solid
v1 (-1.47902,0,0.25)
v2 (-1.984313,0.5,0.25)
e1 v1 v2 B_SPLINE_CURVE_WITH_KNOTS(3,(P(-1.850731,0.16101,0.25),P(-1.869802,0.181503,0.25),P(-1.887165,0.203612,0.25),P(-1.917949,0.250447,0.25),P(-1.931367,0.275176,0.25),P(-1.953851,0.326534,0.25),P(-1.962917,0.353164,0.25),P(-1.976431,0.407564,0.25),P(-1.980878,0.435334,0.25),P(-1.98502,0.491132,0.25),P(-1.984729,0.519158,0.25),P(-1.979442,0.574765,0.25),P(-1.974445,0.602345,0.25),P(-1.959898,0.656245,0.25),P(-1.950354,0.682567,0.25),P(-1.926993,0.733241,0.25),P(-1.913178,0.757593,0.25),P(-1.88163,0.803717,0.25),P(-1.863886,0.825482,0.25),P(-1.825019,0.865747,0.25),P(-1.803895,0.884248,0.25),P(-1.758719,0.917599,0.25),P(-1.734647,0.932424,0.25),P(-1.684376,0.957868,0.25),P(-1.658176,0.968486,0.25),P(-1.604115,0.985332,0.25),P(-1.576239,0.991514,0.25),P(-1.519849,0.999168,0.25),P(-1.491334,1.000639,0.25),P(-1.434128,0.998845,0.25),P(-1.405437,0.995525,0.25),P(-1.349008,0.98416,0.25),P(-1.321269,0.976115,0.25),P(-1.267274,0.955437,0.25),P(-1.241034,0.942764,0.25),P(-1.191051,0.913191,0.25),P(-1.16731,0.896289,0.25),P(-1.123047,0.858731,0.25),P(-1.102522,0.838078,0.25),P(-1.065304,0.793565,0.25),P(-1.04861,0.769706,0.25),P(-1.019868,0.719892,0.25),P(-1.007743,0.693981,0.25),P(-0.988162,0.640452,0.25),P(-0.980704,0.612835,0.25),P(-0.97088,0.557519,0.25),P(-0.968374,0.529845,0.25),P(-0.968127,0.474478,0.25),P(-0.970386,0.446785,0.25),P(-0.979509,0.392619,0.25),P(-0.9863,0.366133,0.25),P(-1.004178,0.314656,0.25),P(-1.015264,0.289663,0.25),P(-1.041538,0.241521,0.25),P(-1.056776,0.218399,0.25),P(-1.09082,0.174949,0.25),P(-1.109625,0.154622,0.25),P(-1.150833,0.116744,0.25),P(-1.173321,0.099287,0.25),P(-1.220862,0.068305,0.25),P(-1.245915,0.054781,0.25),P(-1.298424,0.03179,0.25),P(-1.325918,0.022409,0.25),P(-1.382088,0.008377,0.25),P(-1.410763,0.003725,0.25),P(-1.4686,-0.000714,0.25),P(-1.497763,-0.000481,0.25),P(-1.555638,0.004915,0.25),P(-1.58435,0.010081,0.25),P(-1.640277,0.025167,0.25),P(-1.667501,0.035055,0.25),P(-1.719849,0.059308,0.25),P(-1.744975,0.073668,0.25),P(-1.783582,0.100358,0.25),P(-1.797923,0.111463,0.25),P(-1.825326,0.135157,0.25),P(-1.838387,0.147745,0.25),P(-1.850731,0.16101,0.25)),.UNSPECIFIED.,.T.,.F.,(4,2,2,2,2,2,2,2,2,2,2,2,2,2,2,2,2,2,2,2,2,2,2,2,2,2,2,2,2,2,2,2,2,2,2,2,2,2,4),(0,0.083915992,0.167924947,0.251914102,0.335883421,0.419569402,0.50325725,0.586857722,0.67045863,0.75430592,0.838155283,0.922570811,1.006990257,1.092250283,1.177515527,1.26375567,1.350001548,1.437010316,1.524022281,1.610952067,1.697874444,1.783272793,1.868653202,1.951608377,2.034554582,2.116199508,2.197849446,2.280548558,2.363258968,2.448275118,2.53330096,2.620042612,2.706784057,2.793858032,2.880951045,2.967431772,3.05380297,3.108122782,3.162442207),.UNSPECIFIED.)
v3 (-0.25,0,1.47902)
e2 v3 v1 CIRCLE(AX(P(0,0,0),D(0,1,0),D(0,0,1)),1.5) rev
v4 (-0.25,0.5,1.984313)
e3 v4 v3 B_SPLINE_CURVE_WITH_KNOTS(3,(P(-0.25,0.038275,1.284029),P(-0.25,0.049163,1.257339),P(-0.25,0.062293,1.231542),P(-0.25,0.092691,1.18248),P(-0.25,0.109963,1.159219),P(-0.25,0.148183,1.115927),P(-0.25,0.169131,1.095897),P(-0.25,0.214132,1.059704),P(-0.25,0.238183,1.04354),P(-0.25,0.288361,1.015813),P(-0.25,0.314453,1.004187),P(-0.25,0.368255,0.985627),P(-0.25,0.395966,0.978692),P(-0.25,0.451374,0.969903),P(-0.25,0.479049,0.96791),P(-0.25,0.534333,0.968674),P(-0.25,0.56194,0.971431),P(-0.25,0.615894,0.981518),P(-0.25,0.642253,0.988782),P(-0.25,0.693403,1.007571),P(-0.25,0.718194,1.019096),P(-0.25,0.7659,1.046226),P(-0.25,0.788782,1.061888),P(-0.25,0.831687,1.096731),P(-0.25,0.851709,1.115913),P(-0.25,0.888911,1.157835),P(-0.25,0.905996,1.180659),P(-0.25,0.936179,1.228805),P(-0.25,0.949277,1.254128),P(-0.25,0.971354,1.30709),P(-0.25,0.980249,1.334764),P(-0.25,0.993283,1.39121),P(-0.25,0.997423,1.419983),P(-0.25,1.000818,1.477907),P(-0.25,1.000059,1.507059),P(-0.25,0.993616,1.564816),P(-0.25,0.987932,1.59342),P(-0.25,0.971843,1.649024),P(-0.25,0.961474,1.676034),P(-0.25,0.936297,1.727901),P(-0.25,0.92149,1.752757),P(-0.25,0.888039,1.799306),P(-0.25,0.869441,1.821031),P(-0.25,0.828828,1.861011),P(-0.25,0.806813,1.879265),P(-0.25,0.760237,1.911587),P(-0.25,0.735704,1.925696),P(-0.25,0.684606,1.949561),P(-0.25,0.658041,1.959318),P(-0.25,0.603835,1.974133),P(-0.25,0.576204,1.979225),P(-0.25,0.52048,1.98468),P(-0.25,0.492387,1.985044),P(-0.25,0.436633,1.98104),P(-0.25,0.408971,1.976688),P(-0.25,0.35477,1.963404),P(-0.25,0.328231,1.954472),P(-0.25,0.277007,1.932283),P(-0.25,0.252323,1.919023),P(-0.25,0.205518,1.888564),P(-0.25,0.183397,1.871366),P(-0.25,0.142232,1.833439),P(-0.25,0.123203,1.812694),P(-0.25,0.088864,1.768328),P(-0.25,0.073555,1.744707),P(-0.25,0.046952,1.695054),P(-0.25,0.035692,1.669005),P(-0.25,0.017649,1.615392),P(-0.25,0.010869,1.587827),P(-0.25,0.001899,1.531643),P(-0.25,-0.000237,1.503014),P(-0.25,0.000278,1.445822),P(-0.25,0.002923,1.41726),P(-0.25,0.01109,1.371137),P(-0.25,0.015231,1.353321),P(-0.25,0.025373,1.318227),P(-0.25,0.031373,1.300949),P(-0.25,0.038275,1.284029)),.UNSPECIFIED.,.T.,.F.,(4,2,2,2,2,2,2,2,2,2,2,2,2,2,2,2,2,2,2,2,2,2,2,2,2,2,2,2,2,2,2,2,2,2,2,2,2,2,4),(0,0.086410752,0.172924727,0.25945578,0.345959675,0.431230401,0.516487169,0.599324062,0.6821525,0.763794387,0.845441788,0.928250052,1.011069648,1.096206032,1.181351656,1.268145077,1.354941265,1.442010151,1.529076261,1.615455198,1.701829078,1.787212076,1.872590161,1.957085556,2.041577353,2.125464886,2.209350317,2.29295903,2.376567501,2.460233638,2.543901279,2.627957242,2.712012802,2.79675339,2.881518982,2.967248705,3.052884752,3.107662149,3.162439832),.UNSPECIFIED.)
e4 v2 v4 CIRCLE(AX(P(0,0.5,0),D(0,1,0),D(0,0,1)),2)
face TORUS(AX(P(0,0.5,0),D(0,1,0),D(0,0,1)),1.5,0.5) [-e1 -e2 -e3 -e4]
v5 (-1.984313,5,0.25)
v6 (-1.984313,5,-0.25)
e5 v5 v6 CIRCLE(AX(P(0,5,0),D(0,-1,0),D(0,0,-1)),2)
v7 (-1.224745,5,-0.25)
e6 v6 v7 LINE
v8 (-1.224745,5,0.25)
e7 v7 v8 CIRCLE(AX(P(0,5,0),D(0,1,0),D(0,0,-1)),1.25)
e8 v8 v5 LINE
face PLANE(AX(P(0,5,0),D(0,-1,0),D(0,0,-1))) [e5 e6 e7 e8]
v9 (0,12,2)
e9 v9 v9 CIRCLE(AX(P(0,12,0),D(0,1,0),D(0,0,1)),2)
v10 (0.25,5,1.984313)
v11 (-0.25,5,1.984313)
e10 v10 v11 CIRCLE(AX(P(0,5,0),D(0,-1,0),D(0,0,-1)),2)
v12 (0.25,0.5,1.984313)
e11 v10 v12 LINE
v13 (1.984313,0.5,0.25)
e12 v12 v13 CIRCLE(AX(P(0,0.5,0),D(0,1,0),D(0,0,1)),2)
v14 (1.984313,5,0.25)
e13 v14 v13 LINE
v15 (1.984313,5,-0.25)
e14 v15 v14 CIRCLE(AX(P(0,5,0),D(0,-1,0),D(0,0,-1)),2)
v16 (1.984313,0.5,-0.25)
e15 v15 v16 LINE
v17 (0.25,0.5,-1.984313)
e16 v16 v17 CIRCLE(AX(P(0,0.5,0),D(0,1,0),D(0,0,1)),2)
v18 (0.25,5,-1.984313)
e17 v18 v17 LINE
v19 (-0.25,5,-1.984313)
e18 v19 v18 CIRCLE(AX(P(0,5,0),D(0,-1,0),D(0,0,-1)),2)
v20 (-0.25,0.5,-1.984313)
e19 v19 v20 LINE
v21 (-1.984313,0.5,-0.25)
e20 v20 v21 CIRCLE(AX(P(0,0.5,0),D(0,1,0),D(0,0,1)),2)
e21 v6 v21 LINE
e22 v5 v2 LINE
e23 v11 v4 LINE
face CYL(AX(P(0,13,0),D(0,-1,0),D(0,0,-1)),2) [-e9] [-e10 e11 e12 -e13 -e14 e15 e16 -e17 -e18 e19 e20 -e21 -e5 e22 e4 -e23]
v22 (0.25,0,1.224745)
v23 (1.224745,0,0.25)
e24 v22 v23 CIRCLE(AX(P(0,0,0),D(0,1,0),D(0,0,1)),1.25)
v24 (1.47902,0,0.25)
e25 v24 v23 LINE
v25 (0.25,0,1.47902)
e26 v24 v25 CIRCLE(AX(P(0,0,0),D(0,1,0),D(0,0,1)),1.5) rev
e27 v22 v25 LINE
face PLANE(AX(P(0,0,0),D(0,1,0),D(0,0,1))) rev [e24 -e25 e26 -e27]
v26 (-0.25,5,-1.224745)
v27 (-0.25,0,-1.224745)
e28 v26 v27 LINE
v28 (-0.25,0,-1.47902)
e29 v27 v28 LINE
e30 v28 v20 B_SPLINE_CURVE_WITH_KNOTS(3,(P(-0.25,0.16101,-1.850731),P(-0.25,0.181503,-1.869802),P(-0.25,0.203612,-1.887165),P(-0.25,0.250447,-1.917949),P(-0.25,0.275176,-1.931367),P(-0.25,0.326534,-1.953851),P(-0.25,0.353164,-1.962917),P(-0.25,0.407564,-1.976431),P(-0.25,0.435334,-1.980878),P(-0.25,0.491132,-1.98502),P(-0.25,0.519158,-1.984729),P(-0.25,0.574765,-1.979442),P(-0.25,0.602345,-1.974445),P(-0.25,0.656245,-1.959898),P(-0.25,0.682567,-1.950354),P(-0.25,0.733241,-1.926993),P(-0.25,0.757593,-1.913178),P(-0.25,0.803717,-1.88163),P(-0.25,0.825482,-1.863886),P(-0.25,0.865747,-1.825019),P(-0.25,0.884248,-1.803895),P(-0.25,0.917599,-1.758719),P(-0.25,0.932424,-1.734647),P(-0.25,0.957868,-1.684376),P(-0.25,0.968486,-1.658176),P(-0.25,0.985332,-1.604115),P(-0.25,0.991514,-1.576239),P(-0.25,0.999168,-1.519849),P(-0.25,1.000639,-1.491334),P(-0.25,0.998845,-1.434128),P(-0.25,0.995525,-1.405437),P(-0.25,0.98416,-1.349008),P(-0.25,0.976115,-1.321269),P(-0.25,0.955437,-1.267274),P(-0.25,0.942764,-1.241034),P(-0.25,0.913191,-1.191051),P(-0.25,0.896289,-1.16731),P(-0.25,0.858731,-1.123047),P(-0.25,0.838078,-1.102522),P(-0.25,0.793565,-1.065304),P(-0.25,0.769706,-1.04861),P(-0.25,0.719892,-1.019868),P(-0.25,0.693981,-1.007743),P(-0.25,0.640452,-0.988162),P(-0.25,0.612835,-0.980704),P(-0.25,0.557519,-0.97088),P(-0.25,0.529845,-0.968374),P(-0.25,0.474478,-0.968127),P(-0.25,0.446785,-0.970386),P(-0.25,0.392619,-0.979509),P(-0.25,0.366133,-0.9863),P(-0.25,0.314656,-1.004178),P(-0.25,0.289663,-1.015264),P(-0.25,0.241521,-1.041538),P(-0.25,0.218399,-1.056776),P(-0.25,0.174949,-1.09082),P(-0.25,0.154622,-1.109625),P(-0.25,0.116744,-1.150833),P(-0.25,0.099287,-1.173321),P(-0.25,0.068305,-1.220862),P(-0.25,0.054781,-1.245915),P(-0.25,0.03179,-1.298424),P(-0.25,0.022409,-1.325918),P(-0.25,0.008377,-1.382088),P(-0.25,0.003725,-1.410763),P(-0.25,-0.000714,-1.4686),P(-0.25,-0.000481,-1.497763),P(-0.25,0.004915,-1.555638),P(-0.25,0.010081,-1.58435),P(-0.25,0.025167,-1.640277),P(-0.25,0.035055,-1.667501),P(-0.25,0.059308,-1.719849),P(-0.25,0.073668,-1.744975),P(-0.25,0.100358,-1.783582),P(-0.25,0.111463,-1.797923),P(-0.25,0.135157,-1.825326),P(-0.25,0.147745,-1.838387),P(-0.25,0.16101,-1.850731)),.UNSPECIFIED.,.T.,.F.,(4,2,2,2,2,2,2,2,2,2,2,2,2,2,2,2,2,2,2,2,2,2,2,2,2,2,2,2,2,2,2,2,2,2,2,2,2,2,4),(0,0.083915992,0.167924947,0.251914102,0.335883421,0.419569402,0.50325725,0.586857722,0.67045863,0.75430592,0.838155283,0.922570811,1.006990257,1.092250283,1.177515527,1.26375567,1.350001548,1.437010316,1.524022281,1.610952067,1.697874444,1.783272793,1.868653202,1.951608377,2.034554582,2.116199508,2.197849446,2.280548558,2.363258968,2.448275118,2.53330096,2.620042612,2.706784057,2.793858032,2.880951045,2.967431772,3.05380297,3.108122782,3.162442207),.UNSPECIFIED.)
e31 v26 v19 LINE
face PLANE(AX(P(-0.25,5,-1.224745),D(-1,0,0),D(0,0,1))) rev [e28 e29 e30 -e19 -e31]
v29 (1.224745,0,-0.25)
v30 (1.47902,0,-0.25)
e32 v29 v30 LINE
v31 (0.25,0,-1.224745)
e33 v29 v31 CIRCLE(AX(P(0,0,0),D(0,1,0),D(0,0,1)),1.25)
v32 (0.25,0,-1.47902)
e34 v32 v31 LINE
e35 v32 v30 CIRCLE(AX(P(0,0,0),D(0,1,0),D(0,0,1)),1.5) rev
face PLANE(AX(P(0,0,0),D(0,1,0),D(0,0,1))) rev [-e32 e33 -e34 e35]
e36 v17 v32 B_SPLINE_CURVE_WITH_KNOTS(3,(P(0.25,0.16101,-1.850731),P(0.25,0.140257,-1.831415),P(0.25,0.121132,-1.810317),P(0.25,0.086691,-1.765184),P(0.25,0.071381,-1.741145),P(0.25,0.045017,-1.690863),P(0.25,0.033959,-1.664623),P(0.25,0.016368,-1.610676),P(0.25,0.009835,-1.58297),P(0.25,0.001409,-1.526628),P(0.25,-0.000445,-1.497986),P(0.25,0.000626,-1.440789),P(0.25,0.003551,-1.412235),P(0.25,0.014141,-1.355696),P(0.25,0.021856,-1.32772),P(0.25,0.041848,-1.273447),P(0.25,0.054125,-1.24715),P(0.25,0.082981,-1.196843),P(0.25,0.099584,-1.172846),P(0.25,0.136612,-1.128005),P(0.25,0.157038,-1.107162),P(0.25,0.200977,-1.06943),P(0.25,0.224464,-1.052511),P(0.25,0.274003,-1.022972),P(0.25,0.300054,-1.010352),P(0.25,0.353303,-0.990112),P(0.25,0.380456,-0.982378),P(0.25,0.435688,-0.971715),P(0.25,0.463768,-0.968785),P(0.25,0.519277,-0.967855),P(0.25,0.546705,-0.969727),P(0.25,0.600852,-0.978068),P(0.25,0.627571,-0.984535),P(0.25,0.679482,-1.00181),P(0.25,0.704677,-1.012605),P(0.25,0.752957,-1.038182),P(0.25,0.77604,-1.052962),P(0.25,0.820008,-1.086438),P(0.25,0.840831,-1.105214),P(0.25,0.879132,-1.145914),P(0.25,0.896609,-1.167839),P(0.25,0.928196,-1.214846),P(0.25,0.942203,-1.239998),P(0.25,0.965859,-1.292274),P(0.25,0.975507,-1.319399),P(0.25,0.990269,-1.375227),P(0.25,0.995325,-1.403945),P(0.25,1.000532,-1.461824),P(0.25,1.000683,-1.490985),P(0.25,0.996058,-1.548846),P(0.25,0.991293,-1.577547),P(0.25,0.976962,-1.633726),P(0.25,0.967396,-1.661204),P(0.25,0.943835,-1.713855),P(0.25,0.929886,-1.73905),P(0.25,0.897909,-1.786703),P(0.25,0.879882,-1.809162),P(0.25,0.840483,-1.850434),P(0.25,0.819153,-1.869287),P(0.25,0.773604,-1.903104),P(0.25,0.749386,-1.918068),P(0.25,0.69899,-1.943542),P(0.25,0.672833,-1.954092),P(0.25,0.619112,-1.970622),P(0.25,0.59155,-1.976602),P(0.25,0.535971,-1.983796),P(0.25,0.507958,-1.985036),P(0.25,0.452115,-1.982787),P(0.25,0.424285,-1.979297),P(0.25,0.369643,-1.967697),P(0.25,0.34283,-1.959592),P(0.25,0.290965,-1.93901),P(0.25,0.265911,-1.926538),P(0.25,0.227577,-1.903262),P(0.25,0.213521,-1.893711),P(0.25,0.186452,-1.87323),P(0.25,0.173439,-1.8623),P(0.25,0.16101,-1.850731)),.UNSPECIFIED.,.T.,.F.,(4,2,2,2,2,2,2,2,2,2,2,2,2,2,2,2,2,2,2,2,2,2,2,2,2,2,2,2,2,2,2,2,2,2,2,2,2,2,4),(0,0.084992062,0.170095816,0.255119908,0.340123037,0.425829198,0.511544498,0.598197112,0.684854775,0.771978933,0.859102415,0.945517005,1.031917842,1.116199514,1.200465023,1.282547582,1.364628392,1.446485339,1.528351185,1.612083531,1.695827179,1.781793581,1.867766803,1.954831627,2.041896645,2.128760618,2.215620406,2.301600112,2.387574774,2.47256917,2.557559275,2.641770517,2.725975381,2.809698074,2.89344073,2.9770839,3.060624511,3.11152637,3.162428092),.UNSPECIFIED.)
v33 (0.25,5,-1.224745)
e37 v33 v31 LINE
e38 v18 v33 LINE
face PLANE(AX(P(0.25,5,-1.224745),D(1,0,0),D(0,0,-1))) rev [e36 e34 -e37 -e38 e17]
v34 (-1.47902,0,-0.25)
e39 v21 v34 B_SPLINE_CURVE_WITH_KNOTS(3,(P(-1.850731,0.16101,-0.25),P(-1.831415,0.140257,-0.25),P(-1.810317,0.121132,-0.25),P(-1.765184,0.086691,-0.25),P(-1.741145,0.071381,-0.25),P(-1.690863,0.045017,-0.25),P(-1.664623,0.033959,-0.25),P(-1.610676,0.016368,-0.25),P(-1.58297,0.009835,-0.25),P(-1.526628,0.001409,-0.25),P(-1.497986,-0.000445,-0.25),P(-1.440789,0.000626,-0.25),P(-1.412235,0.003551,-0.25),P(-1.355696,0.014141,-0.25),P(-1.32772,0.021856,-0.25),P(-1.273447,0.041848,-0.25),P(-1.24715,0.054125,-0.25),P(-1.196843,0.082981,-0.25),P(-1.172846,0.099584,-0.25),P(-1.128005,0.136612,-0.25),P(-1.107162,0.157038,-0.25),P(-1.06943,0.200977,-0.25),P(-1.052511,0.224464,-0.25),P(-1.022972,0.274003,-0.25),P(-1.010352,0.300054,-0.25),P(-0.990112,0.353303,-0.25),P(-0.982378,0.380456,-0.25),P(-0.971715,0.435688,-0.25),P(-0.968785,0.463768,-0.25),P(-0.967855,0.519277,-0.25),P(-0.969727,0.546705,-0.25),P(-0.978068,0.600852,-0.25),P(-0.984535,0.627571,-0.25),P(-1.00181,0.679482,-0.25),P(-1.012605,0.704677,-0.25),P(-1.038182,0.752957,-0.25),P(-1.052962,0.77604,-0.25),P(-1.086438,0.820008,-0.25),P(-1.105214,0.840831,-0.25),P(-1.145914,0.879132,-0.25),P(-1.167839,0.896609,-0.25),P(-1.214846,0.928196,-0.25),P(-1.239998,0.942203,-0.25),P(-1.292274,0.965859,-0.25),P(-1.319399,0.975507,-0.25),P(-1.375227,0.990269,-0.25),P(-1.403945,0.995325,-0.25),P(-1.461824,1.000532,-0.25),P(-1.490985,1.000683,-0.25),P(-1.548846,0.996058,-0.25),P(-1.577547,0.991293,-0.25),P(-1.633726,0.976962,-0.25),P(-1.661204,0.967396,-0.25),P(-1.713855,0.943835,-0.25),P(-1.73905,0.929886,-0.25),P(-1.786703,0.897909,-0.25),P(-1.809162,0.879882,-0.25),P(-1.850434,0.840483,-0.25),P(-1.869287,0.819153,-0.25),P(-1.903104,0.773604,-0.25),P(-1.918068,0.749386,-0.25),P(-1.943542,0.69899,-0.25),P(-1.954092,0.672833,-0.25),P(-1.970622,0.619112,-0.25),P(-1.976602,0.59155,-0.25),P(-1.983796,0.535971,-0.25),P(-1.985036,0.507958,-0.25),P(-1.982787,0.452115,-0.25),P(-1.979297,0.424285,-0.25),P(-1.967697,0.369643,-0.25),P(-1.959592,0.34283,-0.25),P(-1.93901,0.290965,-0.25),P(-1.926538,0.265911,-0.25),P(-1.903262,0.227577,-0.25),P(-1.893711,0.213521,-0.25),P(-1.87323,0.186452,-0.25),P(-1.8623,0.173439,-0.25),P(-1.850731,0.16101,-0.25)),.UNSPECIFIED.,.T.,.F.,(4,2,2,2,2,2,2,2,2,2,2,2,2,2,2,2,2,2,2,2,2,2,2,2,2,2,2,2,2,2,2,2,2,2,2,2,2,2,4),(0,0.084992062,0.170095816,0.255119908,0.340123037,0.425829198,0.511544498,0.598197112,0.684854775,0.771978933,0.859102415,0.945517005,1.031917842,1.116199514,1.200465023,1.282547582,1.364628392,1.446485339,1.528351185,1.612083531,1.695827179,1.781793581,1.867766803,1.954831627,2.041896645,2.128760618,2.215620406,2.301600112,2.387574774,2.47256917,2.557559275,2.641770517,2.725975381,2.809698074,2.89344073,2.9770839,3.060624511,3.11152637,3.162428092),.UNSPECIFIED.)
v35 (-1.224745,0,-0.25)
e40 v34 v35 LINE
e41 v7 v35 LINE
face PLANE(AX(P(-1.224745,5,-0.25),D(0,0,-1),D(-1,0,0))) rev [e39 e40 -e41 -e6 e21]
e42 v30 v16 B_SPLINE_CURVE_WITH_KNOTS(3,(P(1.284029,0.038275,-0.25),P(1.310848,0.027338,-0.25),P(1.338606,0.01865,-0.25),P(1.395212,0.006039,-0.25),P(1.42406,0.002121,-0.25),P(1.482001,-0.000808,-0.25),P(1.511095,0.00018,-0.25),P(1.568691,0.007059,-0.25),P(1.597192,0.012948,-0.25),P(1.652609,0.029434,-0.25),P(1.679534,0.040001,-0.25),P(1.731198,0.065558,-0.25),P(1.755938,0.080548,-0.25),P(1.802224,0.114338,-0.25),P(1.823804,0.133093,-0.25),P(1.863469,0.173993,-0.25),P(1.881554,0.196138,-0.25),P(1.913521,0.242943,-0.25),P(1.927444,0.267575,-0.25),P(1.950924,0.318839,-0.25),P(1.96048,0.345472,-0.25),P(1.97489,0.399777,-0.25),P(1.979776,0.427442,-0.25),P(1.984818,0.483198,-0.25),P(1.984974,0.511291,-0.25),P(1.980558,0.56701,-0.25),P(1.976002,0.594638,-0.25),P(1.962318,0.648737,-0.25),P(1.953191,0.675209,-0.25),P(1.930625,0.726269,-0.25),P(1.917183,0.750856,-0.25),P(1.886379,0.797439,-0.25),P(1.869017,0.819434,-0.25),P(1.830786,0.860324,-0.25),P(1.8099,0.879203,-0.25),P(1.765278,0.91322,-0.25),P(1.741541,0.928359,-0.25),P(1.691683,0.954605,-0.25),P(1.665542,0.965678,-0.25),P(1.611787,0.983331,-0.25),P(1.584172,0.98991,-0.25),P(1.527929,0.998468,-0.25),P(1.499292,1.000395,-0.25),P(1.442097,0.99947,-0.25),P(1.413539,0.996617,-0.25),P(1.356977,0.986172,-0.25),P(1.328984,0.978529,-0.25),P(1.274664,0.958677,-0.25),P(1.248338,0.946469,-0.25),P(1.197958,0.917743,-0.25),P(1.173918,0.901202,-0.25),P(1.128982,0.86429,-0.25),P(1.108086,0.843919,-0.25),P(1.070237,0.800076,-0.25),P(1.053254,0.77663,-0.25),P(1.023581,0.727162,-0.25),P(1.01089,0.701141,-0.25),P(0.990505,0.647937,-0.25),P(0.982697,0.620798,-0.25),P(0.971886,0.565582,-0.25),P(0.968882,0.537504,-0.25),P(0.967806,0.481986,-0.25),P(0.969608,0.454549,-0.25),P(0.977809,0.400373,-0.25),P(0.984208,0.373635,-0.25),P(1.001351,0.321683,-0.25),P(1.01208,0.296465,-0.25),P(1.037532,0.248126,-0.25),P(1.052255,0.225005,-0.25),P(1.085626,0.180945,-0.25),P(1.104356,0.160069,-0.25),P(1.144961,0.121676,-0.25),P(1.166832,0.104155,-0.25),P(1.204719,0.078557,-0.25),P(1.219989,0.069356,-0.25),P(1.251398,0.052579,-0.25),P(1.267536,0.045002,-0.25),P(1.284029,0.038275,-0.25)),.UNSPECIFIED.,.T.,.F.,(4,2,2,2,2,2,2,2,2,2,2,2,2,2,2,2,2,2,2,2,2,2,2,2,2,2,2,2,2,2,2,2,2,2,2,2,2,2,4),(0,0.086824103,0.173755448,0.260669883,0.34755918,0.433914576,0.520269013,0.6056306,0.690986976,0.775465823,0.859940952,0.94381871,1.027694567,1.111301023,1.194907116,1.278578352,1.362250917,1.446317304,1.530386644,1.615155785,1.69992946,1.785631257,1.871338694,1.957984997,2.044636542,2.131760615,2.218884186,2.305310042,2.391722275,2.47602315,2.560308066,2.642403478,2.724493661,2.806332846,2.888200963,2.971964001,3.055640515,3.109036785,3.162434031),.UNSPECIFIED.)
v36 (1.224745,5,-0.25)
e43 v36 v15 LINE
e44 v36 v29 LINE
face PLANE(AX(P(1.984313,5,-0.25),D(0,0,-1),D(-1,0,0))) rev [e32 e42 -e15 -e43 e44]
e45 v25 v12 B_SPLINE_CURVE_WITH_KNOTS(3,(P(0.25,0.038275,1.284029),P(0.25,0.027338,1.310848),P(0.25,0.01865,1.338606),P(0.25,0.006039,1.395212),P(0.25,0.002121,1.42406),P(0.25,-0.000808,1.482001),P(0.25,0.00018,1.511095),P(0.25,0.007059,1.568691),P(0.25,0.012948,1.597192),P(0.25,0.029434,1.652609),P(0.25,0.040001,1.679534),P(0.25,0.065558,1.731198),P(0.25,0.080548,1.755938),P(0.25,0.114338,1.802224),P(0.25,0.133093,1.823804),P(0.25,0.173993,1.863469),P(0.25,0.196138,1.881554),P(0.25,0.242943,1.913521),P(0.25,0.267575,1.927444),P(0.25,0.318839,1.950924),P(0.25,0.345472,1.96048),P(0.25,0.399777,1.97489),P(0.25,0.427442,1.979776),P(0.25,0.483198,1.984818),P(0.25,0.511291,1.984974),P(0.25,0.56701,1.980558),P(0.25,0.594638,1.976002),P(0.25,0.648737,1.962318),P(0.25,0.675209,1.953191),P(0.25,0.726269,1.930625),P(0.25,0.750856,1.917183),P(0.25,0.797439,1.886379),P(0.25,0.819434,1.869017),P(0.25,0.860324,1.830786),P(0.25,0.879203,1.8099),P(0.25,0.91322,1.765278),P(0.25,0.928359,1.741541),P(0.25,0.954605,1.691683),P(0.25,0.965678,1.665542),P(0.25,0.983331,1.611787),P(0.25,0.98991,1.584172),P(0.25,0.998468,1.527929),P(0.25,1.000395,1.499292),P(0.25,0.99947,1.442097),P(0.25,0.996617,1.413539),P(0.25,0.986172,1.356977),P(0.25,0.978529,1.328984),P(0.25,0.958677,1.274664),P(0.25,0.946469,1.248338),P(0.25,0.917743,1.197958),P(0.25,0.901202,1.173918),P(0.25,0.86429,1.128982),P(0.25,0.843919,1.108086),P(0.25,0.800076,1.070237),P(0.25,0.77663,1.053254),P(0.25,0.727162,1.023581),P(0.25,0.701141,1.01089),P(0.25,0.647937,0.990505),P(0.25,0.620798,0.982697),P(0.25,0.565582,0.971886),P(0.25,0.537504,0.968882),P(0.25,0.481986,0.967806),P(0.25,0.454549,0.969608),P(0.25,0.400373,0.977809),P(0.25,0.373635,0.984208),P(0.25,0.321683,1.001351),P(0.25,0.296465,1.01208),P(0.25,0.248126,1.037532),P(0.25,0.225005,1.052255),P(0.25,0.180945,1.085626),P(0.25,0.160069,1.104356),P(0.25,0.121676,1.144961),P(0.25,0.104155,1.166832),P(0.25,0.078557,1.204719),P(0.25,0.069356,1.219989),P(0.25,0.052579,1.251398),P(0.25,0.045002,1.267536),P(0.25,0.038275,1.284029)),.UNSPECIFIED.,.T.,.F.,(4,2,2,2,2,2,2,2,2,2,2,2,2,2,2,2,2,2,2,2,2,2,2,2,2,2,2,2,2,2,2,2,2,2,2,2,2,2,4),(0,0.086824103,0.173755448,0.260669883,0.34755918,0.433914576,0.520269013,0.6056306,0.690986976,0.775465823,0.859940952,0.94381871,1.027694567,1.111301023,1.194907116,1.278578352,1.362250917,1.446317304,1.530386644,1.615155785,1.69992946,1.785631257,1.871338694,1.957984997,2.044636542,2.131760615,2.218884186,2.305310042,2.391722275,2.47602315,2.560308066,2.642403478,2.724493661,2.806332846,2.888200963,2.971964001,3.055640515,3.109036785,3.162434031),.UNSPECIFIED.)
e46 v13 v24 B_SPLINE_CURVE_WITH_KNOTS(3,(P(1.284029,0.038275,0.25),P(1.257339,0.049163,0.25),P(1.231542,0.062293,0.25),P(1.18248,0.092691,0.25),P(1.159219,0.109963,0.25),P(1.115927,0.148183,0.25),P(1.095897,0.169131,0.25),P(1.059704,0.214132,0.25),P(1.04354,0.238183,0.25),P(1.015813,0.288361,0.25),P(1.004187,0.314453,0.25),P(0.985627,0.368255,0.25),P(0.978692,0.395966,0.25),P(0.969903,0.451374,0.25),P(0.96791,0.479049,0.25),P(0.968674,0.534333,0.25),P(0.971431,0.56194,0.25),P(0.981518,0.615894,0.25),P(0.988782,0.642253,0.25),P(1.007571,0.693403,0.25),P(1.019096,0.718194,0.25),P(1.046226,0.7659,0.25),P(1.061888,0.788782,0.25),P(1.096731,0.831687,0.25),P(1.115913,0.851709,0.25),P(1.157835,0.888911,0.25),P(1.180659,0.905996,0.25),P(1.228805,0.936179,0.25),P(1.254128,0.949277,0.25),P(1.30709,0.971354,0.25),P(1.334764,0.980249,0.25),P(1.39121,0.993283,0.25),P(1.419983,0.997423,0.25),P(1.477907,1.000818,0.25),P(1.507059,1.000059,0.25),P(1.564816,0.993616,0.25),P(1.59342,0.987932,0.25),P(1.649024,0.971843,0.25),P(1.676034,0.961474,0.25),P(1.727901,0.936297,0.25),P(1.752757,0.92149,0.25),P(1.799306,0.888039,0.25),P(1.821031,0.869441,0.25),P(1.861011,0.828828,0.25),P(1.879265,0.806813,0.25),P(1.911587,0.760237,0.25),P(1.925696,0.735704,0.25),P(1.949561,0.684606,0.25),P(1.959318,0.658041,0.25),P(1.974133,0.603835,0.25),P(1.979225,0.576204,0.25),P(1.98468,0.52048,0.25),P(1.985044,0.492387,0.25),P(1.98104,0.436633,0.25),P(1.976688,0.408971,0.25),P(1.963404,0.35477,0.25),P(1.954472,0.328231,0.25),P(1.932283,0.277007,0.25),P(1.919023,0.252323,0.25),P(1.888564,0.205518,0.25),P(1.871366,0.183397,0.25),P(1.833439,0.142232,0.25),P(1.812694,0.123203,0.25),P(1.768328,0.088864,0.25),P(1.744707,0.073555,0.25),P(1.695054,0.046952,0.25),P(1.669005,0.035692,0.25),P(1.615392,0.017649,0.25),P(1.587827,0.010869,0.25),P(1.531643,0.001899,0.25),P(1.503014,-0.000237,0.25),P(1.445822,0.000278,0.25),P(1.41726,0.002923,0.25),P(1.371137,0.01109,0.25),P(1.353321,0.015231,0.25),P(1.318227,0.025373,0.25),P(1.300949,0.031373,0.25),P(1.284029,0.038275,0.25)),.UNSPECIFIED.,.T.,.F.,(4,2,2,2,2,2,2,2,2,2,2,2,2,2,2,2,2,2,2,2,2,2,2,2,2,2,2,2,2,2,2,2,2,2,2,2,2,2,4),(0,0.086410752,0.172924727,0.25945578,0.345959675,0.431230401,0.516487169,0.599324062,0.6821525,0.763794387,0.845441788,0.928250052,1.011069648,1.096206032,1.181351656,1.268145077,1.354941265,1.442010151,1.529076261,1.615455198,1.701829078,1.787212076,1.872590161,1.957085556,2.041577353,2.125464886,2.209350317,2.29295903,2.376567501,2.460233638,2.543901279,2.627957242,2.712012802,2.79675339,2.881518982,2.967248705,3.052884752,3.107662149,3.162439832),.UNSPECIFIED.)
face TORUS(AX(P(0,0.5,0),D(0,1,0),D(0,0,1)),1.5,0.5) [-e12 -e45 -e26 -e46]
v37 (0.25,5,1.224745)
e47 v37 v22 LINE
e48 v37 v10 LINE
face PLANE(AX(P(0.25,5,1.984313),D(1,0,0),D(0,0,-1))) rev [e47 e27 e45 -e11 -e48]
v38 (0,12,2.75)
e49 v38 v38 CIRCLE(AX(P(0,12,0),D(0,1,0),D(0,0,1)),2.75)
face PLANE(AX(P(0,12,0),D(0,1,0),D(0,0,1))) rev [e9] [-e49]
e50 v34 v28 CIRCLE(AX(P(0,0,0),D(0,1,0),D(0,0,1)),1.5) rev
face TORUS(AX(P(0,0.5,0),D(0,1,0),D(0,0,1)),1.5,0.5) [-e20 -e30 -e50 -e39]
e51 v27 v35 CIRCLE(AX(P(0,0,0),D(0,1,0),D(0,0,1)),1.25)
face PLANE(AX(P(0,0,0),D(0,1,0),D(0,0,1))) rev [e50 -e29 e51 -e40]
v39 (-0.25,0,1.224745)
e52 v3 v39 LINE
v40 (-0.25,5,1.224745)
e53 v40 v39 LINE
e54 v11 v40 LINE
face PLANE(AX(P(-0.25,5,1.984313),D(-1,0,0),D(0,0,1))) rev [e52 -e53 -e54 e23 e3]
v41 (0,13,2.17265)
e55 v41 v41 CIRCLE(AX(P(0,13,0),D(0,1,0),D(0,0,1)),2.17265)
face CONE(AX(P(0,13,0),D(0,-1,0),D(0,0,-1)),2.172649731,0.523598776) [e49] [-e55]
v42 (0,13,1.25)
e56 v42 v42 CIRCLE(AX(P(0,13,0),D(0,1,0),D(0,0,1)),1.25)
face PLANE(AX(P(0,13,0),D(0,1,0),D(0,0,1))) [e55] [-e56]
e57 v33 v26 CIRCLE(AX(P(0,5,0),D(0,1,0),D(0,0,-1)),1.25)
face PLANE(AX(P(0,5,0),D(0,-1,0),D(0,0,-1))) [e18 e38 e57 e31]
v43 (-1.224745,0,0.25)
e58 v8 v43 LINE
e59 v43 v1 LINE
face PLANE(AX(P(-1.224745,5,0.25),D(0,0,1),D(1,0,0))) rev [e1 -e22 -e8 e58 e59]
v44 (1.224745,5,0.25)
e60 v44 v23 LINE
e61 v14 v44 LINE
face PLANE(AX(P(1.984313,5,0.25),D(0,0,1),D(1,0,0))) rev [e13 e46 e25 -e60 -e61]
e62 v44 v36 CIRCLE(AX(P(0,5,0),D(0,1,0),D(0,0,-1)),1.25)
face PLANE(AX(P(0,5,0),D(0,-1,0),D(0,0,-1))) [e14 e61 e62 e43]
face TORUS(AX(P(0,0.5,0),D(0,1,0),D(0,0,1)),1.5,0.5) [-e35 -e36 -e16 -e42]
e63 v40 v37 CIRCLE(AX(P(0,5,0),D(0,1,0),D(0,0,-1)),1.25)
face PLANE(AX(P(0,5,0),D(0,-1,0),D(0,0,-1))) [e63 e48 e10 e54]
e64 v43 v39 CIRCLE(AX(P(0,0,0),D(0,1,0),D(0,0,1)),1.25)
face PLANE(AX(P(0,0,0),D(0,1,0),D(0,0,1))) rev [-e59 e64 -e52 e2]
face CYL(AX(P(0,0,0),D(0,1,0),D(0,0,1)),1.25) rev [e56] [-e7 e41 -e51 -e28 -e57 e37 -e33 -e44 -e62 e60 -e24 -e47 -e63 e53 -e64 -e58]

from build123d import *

# Parameters (mm, degrees)
ESQUISSE1_R             = 2
BOSS_EXTRU_1_DEPTH      = 13
ESQUISSE2_R             = 2.75
BOSS_EXTRU_2_DEPTH      = 1
ESQUISSE3_R             = 1.25
ENL_V_MAT_EXTRU_1_DEPTH = 14.569266745
CHANFREIN1_SIZE         = 1
CHANFREIN1_SIZE_2       = 0.577350269
CONG_2_R                = 0.5
ENL_V_MAT_EXTRU_2_DEPTH = 5


with BuildPart() as part:
    # Esquisse1 → Boss.-Extru.1 (new body)
    with BuildSketch(Plane(origin=(0, 0, 0), x_dir=(1, 0, 0), z_dir=(0, 1, 0))):
        with Locations(Location((0, 0, 0), (0, 0, 90))):
            Circle(ESQUISSE1_R)
    extrude(amount=BOSS_EXTRU_1_DEPTH)

    # Esquisse2 → Boss.-Extru.2 (add)
    with BuildSketch(Plane(origin=(0, 13, 0), x_dir=(1, 0, 0), z_dir=(0, 1, 0))):
        with Locations(Location((0, 0, 0), (0, 0, 270))):
            Circle(ESQUISSE2_R)
    extrude(amount=-BOSS_EXTRU_2_DEPTH)

    # Esquisse3 → Enlèv. mat.-Extru.1 (cut, through all)
    with BuildSketch(Plane(origin=(0, 13, 0), x_dir=(1, 0, 0), z_dir=(0, 1, 0))):
        with Locations(Location((0, 0, 0), (0, 0, 270))):
            Circle(ESQUISSE3_R)
    extrude(amount=-ENL_V_MAT_EXTRU_1_DEPTH, mode=Mode.SUBTRACT)

    # Chanfrein1
    # the kernel refuses this chamfer: 1, 0.577350269 mm, written as the material it takes off along each edge
    with BuildSketch(Plane(origin=(0, 13, 0), x_dir=(0, 0, 1), z_dir=(-1, 0, 0))) as chanfrein1_piece_1:
        Polygon((2.75, -CHANFREIN1_SIZE), (2.75 - CHANFREIN1_SIZE_2, 0), (2.75, 0), align=None)
    revolve(axis=Axis((0, 13, 0), (0, 1, 0)), mode=Mode.SUBTRACT)

    # Congé2
    cong_2_edges = [part.edges().sort_by_distance(p)[0] for p in [
        (0, 0, 2),
    ]]
    fillet(cong_2_edges, radius=CONG_2_R)

    # Esquisse4 → Enlèv. mat.-Extru.2 (cut)
    with BuildSketch(Plane.XZ):
        with BuildLine():
            Line((0.25, 1.984313483), (0.25, 1.224744871))
            ThreePointArc((0.25, 1.224744871), (0, 1.25), (-0.25, 1.224744871))
            Line((-0.25, 1.224744871), (-0.25, 1.984313483))
            ThreePointArc((-0.25, 1.984313483), (0, 2), (0.25, 1.984313483))
        make_face()
        with BuildLine():
            Line((1.984313483, 0.25), (1.224744871, 0.25))
            ThreePointArc((1.224744871, 0.25), (1.25, 0), (1.224744871, -0.25))
            Line((1.224744871, -0.25), (1.984313483, -0.25))
            ThreePointArc((1.984313483, -0.25), (2, 0), (1.984313483, 0.25))
        make_face()
        with BuildLine():
            Line((-1.224744871, -0.25), (-1.984313483, -0.25))
            ThreePointArc((-1.984313483, -0.25), (-2, 0), (-1.984313483, 0.25))
            Line((-1.984313483, 0.25), (-1.224744871, 0.25))
            ThreePointArc((-1.224744871, 0.25), (-1.25, 0), (-1.224744871, -0.25))
        make_face()
        with BuildLine():
            Line((0.25, -1.224744871), (0.25, -1.984313483))
            ThreePointArc((0.25, -1.984313483), (0, -2), (-0.25, -1.984313483))
            Line((-0.25, -1.984313483), (-0.25, -1.224744871))
            ThreePointArc((-0.25, -1.224744871), (0, -1.25), (0.25, -1.224744871))
        make_face()
    extrude(amount=-ENL_V_MAT_EXTRU_2_DEPTH, mode=Mode.SUBTRACT)


solid = part.part
